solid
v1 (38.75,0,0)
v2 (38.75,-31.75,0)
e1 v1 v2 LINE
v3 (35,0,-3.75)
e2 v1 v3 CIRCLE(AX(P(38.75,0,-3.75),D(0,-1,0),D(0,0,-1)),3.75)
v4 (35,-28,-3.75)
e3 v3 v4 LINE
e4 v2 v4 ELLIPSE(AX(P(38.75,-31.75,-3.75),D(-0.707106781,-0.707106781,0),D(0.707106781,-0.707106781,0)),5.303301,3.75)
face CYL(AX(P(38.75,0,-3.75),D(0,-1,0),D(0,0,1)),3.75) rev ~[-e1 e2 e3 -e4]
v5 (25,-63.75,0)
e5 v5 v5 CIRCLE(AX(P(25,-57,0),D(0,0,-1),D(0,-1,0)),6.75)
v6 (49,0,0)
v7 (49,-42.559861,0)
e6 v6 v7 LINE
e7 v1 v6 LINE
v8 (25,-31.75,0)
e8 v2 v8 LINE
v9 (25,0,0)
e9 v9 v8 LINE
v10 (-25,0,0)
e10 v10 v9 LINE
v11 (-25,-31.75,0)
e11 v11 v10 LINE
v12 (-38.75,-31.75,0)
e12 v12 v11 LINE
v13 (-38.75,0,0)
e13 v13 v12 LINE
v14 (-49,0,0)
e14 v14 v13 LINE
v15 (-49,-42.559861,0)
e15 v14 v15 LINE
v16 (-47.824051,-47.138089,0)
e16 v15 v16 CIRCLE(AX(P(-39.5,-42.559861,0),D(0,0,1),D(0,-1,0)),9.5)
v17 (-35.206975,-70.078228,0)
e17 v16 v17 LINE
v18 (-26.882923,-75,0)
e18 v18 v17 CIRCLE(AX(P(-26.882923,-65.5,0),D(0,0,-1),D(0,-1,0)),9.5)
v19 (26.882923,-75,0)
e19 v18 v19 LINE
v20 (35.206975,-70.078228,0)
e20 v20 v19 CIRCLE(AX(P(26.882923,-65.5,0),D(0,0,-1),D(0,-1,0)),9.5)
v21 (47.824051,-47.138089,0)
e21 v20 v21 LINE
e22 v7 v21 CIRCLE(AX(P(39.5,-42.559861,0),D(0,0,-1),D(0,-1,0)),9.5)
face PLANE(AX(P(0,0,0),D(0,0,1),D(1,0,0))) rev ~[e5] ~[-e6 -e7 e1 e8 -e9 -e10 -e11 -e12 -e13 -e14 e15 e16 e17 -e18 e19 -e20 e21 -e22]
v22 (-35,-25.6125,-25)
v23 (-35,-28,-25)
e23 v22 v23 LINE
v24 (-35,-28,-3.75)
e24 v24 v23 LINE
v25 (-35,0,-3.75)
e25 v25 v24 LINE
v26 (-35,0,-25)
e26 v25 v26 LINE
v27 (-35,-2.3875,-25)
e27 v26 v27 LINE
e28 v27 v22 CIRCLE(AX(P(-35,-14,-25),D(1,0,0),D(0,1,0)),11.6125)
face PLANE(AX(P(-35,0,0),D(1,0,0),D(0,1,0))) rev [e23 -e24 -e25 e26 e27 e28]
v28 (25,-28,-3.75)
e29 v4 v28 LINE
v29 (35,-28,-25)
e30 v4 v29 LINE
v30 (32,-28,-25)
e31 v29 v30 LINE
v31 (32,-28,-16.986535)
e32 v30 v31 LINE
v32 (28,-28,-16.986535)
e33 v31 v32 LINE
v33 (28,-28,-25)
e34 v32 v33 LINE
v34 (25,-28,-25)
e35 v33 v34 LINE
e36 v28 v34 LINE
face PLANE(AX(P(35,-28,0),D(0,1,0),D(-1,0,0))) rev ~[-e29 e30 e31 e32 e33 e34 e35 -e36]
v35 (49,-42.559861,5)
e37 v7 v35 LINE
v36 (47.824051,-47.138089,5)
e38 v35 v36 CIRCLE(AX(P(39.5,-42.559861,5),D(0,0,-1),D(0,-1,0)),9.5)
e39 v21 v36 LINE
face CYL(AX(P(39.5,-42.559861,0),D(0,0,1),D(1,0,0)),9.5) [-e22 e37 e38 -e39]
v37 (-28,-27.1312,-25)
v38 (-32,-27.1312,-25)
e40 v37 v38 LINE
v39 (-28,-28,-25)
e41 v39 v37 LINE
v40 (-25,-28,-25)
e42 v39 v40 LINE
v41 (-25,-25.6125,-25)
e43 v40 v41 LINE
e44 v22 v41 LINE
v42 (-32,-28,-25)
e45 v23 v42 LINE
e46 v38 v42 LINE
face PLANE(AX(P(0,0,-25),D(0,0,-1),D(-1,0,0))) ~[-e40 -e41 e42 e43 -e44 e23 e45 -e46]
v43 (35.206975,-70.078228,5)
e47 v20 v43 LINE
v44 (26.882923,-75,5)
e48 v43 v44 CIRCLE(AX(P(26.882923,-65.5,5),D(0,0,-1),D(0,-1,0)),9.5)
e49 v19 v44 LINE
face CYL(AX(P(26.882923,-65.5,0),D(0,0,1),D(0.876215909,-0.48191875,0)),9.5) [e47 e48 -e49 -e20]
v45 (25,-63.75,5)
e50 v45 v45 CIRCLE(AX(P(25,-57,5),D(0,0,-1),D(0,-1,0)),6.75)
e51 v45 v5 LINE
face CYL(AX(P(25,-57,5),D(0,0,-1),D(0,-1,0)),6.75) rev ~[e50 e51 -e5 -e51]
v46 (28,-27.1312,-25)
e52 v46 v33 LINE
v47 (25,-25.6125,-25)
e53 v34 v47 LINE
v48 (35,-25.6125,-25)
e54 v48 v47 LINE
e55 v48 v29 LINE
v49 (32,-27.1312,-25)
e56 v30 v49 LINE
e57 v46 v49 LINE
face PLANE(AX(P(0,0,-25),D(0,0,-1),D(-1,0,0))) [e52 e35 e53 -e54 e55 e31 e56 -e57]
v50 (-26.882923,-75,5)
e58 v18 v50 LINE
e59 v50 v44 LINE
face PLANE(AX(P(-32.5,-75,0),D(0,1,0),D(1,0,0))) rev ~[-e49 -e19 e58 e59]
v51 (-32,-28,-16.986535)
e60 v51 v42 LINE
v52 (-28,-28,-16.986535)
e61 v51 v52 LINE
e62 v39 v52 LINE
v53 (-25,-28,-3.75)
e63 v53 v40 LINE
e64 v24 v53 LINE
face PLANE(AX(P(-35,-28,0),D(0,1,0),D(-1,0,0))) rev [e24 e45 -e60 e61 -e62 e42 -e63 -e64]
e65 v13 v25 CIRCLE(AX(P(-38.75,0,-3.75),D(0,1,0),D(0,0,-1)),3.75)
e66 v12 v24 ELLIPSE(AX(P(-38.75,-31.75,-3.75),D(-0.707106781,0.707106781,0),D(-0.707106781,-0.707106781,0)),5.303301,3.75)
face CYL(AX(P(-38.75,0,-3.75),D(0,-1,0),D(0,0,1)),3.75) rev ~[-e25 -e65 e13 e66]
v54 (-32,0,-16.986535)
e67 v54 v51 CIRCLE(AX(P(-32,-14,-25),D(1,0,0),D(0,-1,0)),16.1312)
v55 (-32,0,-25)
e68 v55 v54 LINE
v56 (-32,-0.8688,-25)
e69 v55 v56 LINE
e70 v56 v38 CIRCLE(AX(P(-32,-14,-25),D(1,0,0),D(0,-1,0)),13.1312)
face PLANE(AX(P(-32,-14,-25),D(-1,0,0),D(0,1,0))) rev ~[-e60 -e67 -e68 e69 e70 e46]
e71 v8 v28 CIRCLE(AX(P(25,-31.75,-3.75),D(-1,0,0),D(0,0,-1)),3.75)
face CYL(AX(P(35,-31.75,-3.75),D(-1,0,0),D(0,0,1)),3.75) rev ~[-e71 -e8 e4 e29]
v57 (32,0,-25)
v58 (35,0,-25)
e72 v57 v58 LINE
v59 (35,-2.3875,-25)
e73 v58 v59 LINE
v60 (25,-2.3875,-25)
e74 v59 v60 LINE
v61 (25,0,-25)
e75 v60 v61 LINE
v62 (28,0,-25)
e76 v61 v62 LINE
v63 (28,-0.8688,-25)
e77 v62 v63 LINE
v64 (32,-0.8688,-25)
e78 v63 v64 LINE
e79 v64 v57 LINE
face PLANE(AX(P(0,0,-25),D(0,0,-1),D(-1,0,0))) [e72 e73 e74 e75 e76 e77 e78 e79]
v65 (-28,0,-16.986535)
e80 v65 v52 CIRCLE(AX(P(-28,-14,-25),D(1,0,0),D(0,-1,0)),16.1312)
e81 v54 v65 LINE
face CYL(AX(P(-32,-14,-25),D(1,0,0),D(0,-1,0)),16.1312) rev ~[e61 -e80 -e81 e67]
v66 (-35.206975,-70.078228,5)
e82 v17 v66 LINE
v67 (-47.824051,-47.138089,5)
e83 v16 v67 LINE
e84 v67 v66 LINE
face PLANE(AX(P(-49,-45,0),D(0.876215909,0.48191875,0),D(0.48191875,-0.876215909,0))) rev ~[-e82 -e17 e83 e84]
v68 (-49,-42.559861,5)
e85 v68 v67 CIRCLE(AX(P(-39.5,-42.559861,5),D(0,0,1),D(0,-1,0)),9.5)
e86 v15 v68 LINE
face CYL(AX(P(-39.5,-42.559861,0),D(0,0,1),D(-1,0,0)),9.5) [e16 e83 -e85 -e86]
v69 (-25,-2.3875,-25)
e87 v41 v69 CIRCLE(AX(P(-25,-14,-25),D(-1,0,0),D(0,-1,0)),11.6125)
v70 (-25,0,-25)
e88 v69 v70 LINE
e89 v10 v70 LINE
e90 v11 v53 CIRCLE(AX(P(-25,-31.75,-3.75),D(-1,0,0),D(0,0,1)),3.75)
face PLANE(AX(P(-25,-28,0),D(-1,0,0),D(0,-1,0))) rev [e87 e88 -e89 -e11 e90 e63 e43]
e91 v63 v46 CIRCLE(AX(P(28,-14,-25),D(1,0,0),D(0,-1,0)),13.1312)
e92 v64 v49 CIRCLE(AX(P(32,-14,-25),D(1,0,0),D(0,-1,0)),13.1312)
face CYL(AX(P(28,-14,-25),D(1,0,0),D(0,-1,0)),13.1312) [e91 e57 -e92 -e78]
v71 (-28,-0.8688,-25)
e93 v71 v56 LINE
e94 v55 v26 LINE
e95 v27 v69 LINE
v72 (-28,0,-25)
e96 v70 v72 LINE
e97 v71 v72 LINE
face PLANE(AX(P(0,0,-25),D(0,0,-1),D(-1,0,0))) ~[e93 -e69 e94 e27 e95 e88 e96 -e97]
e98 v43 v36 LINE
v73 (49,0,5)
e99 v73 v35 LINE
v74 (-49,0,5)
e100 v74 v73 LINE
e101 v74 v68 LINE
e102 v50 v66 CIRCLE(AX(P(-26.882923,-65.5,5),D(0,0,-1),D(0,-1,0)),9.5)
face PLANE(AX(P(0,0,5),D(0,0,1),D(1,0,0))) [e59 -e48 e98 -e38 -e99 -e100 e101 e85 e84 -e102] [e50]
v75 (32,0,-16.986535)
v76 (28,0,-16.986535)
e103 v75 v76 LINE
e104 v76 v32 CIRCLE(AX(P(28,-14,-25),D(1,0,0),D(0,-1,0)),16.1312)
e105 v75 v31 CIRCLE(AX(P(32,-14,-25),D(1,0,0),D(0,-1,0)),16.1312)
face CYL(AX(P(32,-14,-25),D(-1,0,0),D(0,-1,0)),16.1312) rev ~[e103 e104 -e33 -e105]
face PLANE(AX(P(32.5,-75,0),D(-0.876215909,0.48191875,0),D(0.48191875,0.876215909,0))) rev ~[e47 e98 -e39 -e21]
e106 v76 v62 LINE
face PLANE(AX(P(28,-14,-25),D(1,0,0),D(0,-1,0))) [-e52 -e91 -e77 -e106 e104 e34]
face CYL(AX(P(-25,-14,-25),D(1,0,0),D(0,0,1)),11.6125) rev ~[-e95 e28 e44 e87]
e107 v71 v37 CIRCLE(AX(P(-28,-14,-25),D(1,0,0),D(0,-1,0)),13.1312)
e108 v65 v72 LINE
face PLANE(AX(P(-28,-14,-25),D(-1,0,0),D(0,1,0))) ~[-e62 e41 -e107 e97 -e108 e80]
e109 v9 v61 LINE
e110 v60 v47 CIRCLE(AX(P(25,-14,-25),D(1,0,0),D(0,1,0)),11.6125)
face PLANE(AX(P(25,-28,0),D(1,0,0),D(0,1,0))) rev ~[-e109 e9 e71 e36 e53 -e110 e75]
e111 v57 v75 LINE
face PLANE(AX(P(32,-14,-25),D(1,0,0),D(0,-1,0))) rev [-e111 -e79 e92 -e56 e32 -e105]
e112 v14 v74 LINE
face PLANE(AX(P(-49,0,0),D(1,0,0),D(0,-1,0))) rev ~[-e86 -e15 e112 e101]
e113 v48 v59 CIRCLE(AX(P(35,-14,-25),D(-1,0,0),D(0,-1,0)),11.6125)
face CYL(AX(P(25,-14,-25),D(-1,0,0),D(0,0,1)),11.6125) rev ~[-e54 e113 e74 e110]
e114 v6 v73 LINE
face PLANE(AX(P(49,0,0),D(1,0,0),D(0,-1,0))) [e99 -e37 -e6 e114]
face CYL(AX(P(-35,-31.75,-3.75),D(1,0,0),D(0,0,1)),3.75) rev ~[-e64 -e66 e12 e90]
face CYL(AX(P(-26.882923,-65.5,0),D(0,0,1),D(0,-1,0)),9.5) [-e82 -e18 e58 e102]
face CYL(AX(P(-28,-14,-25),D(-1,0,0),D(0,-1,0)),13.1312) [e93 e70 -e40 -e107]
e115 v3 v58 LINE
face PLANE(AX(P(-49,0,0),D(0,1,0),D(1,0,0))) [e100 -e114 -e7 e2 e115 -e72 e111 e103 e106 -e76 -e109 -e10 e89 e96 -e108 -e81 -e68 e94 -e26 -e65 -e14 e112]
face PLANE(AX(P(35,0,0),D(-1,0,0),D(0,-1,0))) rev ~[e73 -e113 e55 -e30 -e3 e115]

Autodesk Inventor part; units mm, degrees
ref_plane "YZ Plane" through (0, 0, 0) normal (1, 0, 0) x (0, 1, 0)
ref_plane "XZ Plane" through (0, 0, 0) normal (0, 1, 0) x (-1, 0, 0)
sketch "Sketch1" plane through (0, 0, 0) normal (0, 0, 1) x (1, 0, 0)
  line L0 (-49, 0) -> (49, 0)
  line L1 (-32.5, -75) -> (32.5, -75)
  line L2 (-49, 0) -> (-49, -45)
  line L3 (49, 0) -> (49, -45)
  line L4 (-49, -45) -> (-32.5, -75)
  line L5 (32.5, -75) -> (49, -45)
  point P0 (0, 0)
  point P1 (0, 0)
  point P2 (0, -75)
  dimension "d0" = 98
  dimension "d1" = 65
  dimension "d2" = 75
  dimension "d4" = 45
extrude "Extrusion1" add sketch "Sketch1" along normal blind 5
sketch "Sketch2" plane through (0, 0, 0) normal (0, 0, -1) x (-1, 0, 0)
  line L0 (-25, 0) -> (25, 0) construction
  line L1 (49, 0) -> (-49, 0) projected
  line L2 (-25, 0) -> (-35, 0)
  line L3 (-35, 0) -> (-35, -28)
  line L4 (-35, -28) -> (-25, -28)
  line L5 (-25, -28) -> (-25, 0)
  point P0 (0, 0)
  point P1 (0, 0)
  dimension "d7" = 50
  dimension "d8" = 10
  dimension "d9" = 28
extrude "Extrusion2" add sketch "Sketch2" along normal blind 25
sketch "Sketch3" plane through (25, -28, 0) normal (-1, 0, 0) x (0, 0, 1)
  line L0 (-25, 0) -> (-25, 28) projected
  circle A0 centre (-25, 14) radius 11.1125
  point P0 (0, 28)
  dimension "d12" = 22.225
extrude "Extrusion3" cut sketch "Sketch3" against normal through all
ref_plane "Work Plane1" through (30, -28, 0) normal (1, 0, 0) x (0, 0, -1)
sketch "Sketch4" plane through (30, -28, 0) normal (1, 0, 0) x (0, 0, -1)
  arc A0 (25, 25.1125) -> (25, 2.8875) centre (25, 14) ccw projected
  circle A1 centre (25, 14) radius 14.6312
  point P0 (0, 28)
  point P1 (25, -0.6312)
  point P2 (25, 28.6312)
sketch "Sketch5" plane through (0, 0, -25) normal (0, 0, -1) x (-1, 0, 0)
  line L0 (-28, -27.1312) -> (-32, -27.1312)
  line L1 (-32, -27.1312) -> (-32, -30.1312)
  line L2 (-32, -30.1312) -> (-28, -30.1312)
  line L3 (-28, -30.1312) -> (-28, -27.1312)
  line L4 (-28, -27.1312) -> (-32, -30.1312) construction
  line L5 (-32, -27.1312) -> (-28, -30.1312) construction
  line L6 (68.6, -14) -> (-68.6, -14) projected
  point P0 (0, 0)
  point P1 (-30, -28.6312)
  dimension "d17" = 4
  dimension "d18" = 3
revolve "Revolution1" cut sketch "Sketch5" angle 360 about axis through (30, -14, -25) along (1, 0, 0)
mirror "Mirror1" about plane through (0, 0, 0) normal (1, 0, 0) of "Extrusion2", "Extrusion3", "Revolution1"
fillet "Fillet1" radius 9.5 4 edges at (-32.5, -75, 2.5) (32.5, -75, 2.5) (49, -45, 2.5) (-49, -45, 2.5)
fillet "Fillet2" radius 3.75 4 edges at (35, -14, 0) (-35, -14, 0) (-30, -28, 0) (30, -28, 0)
thicken "Thicken1" operation add thickness 0.5 both sides no extend neighbours yes toward (0, -0.9485364, 0.316668) faces at (-28.3333, -24.5406, -21.481)
thicken "Thicken2" operation add thickness 0.5 both sides no extend neighbours yes toward (0, -0.8451901, 0.5344658) faces at (28.3333, -23.3922, -19.0607)
sketch "Sketch6" plane through (0, 0, 5) normal (0, 0, 1) x (1, 0, 0)
  arc A0 (-49, -42.5599) -> (-47.8241, -47.1381) centre (-39.5, -42.5599) ccw projected
  line L0 (-47.8241, -47.1381) -> (-35.207, -70.0782) projected
  arc A1 (-35.207, -70.0782) -> (-26.8829, -75) centre (-26.8829, -65.5) ccw projected
  line L1 (-26.8829, -75) -> (26.8829, -75) projected
  arc A2 (26.8829, -75) -> (35.207, -70.0782) centre (26.8829, -65.5) ccw projected
  line L2 (35.207, -70.0782) -> (47.8241, -47.1381) projected
  arc A3 (47.8241, -47.1381) -> (49, -42.5599) centre (39.5, -42.5599) ccw projected
  line L3 (49, -42.5599) -> (49, 0) projected
  line L4 (49, 0) -> (-49, 0) projected
  line L5 (-49, 0) -> (-49, -42.5599) projected
  point P0 (0, 0)
  point P1 (25, -57)
  point P2 (-33, -59)
  dimension "d26" = 18
  dimension "d27" = 24
  dimension "d28" = 16
  dimension "d29" = 16
hole "Hole1" at (25, -57, 5) direction (0, 0, -1) diameter 13.5 end through all
properties part number "7-8 HandlebarPlate"
